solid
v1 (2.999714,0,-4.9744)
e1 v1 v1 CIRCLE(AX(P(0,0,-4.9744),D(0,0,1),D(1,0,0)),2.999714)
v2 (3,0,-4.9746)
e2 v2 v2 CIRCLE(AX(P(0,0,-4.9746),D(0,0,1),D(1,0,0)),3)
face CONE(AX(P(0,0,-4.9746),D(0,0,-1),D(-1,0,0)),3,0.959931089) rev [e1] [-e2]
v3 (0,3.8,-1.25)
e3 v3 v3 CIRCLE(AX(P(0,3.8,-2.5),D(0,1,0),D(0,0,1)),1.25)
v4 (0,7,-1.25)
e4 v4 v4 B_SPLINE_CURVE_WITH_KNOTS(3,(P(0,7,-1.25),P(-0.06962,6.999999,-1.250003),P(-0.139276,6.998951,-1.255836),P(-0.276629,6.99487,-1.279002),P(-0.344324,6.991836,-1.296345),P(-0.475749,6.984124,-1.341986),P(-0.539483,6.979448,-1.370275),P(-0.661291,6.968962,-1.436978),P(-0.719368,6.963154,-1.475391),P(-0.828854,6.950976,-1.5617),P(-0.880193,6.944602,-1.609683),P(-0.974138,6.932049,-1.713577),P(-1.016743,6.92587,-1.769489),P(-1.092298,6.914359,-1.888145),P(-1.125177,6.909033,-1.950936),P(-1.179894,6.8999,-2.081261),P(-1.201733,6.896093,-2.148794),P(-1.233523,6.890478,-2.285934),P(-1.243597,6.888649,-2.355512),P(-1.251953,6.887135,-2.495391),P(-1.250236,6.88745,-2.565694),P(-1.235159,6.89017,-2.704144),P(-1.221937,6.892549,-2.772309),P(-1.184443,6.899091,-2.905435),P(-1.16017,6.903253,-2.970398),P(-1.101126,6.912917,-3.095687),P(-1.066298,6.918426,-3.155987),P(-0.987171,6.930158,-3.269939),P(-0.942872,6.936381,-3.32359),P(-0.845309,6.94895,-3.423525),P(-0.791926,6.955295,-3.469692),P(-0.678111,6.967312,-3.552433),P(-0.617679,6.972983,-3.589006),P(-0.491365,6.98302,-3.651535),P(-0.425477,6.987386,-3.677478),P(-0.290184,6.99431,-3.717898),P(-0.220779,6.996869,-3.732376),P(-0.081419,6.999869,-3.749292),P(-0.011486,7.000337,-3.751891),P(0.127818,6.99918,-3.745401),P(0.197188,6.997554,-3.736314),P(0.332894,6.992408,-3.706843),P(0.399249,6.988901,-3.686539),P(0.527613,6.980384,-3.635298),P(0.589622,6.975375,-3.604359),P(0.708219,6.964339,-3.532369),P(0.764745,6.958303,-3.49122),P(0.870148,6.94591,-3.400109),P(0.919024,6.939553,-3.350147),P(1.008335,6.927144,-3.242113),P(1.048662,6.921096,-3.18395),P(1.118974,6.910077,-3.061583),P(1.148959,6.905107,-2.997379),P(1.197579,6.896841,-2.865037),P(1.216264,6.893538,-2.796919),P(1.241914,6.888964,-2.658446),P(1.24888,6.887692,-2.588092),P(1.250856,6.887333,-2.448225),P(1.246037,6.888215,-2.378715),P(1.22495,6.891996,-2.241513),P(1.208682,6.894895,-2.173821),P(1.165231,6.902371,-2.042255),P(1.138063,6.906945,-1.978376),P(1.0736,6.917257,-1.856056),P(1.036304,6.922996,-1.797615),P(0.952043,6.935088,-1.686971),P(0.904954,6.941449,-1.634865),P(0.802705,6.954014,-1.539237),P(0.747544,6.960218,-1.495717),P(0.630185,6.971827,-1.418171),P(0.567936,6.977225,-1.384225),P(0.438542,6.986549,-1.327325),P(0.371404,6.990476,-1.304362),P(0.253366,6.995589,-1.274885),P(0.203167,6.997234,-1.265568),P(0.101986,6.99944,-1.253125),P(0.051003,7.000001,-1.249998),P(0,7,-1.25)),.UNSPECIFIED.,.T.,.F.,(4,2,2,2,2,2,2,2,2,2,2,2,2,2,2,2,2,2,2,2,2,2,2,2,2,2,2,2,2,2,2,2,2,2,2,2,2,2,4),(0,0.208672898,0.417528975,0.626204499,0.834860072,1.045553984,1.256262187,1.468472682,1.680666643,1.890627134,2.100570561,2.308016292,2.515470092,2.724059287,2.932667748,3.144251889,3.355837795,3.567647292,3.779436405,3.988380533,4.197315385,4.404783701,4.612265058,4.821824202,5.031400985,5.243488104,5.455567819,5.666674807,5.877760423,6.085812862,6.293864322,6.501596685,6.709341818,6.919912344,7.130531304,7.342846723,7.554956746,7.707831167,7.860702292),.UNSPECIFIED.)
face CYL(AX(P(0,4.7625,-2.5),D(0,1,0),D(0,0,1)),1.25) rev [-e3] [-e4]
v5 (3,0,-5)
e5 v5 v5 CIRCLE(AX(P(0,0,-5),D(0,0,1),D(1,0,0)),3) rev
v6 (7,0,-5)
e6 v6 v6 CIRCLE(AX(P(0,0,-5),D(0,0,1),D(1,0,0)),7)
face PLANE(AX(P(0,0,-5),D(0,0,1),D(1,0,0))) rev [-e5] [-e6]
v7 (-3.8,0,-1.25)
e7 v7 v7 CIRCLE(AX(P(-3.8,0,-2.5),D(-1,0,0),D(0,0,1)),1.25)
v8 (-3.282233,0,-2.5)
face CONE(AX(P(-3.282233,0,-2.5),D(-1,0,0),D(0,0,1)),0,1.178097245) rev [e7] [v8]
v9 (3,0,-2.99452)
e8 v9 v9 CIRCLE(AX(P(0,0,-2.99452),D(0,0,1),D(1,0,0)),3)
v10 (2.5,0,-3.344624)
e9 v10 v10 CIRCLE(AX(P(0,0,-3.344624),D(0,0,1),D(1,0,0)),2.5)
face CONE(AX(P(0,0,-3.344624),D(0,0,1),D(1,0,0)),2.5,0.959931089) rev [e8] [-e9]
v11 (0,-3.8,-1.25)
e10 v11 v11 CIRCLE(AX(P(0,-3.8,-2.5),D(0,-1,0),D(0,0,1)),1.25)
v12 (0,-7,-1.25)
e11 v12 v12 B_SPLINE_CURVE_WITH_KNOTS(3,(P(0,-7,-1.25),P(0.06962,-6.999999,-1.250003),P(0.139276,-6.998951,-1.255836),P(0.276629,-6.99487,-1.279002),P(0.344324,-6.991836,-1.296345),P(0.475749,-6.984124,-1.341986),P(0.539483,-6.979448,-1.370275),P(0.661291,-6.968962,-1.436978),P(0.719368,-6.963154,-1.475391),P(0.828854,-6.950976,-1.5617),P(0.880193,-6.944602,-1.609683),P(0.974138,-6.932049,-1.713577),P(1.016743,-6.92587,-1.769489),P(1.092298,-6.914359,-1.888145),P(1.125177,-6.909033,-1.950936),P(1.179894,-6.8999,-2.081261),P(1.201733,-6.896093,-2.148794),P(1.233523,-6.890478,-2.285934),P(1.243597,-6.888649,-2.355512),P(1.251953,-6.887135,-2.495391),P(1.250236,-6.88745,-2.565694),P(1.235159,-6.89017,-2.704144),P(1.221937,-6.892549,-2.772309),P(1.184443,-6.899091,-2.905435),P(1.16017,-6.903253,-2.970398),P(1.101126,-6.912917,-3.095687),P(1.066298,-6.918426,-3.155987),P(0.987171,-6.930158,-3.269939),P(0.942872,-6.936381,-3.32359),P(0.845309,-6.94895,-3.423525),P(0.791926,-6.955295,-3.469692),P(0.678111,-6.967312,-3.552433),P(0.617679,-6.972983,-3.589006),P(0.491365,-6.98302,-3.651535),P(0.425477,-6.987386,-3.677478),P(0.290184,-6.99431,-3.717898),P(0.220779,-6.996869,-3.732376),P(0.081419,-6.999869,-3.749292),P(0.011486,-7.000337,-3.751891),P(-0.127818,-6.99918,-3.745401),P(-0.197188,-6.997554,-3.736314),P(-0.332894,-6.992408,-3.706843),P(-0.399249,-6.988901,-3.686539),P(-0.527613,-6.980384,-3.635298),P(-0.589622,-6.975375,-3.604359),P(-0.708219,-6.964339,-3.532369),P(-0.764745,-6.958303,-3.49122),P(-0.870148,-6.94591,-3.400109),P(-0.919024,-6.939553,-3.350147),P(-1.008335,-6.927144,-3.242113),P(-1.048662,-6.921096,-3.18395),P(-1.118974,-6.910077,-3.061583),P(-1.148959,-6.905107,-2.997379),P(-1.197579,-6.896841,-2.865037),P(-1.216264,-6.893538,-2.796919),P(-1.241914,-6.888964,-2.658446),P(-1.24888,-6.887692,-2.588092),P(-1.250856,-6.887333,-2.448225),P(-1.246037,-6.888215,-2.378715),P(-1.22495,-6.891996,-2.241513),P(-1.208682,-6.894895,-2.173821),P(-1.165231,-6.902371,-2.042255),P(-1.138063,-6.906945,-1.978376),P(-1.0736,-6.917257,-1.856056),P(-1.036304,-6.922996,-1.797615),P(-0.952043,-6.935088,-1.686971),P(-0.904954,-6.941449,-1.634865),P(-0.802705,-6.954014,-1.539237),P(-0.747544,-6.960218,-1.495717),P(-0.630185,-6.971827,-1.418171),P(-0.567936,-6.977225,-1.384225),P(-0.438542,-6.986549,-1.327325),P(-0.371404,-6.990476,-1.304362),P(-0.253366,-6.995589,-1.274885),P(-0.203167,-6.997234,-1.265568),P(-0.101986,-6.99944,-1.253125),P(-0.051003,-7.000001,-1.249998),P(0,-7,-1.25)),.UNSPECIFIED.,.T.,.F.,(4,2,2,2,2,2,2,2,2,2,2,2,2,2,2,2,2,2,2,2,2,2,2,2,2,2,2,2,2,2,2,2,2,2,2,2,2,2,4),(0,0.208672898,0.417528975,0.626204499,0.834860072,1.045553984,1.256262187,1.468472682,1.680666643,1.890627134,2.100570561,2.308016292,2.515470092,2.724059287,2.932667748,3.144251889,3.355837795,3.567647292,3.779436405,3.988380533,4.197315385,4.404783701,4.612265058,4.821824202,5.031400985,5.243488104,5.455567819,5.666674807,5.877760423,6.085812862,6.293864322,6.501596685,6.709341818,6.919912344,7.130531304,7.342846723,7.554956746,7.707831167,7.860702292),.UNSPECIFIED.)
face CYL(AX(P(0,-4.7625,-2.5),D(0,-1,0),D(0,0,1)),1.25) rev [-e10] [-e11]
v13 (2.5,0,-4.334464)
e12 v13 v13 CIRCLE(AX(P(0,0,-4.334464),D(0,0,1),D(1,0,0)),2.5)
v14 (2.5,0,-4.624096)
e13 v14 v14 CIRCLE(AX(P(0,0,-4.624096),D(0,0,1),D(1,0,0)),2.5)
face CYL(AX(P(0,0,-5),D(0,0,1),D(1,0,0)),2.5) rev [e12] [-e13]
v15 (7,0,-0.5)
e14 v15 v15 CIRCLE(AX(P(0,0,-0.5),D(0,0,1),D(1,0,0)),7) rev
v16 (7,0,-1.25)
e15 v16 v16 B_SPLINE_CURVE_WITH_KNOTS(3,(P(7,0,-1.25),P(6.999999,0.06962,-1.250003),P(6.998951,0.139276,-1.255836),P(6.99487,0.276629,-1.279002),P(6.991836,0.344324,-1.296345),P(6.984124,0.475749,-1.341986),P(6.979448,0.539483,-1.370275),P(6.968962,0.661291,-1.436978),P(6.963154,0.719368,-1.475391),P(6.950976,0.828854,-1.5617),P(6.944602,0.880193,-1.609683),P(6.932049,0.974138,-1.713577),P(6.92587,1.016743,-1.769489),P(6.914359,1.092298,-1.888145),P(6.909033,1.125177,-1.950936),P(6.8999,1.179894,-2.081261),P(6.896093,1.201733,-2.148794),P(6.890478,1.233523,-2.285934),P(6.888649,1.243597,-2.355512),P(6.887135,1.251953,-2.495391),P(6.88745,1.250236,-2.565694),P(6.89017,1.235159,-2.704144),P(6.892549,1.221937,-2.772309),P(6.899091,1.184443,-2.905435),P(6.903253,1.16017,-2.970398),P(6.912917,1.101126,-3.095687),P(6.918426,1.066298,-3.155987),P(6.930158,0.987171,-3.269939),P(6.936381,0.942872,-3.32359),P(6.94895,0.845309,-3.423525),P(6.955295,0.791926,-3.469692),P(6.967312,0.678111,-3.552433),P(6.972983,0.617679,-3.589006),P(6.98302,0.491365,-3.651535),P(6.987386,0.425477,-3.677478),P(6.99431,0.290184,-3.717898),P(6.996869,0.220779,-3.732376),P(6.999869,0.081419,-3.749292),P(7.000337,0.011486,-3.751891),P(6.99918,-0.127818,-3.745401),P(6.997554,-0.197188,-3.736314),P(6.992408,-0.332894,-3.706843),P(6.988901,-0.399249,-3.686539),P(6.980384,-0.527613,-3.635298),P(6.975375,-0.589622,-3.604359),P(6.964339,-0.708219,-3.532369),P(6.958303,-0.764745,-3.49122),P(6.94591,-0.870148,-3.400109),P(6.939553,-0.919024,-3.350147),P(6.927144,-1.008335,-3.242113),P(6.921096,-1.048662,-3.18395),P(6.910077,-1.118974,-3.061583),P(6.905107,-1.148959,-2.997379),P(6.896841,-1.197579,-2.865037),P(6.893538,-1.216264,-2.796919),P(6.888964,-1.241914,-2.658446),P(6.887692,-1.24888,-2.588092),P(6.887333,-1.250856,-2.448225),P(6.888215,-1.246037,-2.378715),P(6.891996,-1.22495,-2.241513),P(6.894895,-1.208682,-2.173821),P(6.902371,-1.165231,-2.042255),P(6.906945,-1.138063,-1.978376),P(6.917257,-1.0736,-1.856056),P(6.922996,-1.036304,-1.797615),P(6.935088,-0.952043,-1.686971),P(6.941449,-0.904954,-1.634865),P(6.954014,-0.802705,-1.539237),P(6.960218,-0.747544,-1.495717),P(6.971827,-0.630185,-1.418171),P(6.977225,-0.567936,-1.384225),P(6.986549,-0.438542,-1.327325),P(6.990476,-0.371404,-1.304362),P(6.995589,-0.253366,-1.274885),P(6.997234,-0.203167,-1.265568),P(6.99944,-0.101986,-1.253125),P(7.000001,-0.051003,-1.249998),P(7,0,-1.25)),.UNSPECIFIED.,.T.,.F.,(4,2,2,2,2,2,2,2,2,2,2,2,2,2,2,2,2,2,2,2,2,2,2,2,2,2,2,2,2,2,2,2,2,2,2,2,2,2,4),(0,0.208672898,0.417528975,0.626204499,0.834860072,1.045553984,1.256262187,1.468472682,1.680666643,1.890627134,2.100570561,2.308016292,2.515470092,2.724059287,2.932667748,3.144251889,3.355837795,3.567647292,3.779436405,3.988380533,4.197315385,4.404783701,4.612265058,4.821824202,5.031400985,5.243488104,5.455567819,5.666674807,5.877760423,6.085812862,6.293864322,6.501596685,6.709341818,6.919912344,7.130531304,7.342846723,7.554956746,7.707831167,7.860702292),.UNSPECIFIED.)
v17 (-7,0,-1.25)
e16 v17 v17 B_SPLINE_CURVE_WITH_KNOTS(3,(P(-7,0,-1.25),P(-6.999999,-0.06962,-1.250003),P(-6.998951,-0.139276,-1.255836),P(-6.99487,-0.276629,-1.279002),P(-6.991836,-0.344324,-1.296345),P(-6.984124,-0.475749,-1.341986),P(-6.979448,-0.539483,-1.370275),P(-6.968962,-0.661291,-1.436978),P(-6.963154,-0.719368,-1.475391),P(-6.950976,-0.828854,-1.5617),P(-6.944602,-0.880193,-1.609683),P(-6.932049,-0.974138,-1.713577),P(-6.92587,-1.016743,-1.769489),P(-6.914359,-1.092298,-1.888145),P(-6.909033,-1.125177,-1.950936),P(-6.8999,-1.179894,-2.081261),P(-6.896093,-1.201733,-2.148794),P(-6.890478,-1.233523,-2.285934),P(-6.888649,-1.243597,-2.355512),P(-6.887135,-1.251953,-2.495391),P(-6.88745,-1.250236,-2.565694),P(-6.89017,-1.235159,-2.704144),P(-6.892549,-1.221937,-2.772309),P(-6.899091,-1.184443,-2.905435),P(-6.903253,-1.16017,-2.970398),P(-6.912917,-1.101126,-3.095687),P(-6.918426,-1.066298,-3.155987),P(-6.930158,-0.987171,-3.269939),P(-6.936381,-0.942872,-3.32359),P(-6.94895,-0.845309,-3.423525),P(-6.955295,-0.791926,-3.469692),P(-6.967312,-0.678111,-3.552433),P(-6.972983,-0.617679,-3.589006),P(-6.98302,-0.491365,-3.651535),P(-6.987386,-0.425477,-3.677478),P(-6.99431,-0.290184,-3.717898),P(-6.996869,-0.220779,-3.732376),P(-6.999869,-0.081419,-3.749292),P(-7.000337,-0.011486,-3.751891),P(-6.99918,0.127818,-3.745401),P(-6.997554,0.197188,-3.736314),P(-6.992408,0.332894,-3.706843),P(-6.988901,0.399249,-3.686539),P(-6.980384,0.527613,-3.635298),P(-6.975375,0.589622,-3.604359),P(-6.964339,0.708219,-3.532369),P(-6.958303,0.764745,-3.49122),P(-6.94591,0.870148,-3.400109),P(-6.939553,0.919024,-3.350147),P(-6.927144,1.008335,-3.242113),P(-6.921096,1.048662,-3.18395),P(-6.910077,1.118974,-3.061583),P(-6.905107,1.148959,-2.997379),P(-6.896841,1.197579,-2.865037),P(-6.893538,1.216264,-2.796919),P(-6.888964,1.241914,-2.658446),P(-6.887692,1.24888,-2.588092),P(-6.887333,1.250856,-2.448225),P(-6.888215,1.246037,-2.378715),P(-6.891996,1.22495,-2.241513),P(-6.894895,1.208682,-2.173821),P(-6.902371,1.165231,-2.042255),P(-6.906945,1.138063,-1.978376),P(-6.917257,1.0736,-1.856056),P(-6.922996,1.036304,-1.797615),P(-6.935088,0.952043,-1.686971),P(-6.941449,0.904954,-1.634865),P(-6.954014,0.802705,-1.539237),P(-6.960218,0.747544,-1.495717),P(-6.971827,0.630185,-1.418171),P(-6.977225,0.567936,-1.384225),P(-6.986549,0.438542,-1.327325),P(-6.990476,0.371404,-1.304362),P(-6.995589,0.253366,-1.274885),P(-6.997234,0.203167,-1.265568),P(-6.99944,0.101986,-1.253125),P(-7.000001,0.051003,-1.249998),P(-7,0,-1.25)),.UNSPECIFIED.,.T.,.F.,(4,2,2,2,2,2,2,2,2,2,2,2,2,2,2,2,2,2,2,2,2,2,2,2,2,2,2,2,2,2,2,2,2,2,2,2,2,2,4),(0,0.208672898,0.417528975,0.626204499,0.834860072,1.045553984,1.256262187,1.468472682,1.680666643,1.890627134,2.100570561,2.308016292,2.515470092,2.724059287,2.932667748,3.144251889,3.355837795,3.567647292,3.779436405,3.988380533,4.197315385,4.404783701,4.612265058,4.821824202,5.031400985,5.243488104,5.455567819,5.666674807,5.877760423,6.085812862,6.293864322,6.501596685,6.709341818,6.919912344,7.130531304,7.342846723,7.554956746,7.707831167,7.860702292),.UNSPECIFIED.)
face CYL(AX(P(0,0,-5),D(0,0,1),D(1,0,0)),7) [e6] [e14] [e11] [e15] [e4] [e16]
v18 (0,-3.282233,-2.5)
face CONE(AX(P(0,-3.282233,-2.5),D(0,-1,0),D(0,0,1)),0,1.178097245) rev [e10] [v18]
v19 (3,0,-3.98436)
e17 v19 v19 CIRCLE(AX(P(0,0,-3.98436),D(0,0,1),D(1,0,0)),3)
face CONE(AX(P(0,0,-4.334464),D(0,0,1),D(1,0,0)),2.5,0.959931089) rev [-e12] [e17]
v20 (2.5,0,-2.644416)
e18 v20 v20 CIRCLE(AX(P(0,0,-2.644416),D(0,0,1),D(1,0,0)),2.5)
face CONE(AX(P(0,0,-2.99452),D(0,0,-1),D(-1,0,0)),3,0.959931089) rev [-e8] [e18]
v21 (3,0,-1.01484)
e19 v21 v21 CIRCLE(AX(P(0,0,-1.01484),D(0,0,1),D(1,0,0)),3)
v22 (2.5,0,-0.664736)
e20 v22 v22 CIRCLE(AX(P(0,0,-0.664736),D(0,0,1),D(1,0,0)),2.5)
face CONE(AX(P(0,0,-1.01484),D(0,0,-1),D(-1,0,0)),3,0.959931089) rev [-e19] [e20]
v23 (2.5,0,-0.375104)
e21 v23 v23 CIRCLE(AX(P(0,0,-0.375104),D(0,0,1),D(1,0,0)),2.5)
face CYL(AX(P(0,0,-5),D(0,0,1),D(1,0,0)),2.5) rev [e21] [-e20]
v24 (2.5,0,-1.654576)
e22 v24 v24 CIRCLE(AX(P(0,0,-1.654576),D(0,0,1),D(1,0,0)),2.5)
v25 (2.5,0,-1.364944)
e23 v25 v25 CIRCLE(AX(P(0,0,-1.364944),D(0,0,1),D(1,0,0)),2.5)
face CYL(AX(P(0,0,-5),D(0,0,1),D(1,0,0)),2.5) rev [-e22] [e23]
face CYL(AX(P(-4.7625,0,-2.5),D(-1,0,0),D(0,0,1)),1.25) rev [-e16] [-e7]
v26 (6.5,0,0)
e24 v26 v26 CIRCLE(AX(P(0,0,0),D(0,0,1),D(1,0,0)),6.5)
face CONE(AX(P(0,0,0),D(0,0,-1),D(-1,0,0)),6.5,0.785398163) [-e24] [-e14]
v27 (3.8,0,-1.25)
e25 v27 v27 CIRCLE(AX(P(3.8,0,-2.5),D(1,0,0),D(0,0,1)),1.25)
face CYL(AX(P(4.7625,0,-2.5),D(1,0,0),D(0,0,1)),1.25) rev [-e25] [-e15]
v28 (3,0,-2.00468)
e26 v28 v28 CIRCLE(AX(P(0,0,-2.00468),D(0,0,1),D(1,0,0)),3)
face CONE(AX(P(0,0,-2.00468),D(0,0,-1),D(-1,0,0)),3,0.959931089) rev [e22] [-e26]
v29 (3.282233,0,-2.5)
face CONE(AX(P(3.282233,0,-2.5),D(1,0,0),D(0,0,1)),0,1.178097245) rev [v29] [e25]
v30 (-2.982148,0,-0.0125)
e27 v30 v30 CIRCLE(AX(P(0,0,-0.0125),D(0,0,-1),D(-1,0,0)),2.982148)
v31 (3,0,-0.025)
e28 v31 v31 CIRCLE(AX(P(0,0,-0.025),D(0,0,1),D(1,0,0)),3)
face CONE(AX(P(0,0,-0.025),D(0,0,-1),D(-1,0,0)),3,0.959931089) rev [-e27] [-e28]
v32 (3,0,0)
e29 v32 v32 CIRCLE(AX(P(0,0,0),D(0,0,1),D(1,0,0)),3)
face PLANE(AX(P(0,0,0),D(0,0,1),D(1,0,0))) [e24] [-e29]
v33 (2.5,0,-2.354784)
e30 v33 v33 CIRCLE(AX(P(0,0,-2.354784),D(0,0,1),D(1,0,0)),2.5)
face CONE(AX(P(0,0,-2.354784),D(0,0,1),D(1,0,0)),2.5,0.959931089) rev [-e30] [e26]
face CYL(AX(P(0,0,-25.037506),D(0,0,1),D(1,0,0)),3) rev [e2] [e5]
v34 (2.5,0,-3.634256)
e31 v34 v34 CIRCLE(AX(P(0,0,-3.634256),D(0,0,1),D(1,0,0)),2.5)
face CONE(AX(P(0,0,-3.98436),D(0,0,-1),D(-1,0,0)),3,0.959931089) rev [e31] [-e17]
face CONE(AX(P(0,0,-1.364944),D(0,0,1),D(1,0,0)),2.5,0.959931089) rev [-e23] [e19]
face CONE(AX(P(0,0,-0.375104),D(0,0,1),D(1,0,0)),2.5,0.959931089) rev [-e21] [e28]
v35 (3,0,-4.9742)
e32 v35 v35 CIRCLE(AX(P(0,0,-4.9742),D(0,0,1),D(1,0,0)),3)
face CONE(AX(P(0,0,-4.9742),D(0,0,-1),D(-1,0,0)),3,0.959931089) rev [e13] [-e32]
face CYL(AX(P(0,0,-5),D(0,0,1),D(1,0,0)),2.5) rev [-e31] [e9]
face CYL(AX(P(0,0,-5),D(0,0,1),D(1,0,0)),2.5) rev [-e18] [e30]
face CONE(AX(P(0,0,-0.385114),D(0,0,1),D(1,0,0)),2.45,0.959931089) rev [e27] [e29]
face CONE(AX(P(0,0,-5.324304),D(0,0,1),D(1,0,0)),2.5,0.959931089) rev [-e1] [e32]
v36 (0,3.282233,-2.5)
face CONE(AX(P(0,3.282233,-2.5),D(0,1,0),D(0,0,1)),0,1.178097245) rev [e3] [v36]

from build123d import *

# Parameters (mm, degrees)
BASENUTSKE_R    = 7
BASENUTSKE_R_2  = 2.5
BASENUT_DEPTH   = 5
HOLES_COUNT     = 4
THDSCHPAT_COUNT = 6
THDSCHPAT_PITCH = 0.98984


with BuildPart() as part:
    # BaseNutSke → BaseNut (new body)
    with BuildSketch(Plane.XY):
        Circle(BASENUTSKE_R)
        Circle(BASENUTSKE_R_2, mode=Mode.SUBTRACT)
    extrude(amount=-BASENUT_DEPTH)

    # Chamfer1: read off the stored shape, not the designer's step
    # Chamfer1 outline → Chamfer1 (revolve, cut)
    with BuildSketch(Plane.XZ):
        Polygon((2.5, 0), (2.5, -0.350103769), (3, 0), align=None)
        Polygon((7, 0), (6.5, 0), (7, -0.5), align=None)
        Polygon((3, -4.9746), (2.5, -4.624496231), (2.5, -5), (3, -5), align=None)
    revolve(axis=Axis((0, 0, 0), (0, 0, 1)), mode=Mode.SUBTRACT)

    # HoleSke → Hole (revolve, cut)
    with BuildSketch(Plane(origin=(0, 0, 0), x_dir=(0, 0, -1), z_dir=(1, 0, 0)), mode=Mode.PRIVATE) as hole_sk:
        Polygon((2.5, 7), (2.5, 3.282233047), (3.75, 3.8), (3.75, 7), align=None)
    hole = revolve(hole_sk.sketch.rotate(Axis((0, 4.7625, -2.5), (0, -1, 0)), 180), axis=Axis((0, 4.7625, -2.5), (0, -1, 0)), mode=Mode.SUBTRACT)

    # Holes: Hole ×4 about axis
    holes_axis = Axis((0, 0, 0), (0, 0, 1))
    for i in range(1, HOLES_COUNT):
        add(hole.rotate(holes_axis, i * 360 / HOLES_COUNT), mode=Mode.SUBTRACT)

    # ThdSchSke → ThreadSchematic (revolve, cut)
    with BuildSketch(Plane(origin=(0, 0, 0), x_dir=(1, 0, 0), z_dir=(0, 1, 0)), mode=Mode.PRIVATE) as threadschematic_sk:
        Polygon((-3, 0.025), (-2.5, 0.375103769), (-1.25, 0.375103769), (-1.25, -0.325103769), (-2.5, -0.325103769), align=None)
    threadschematic = revolve(threadschematic_sk.sketch.rotate(Axis((0, 0, -0.525), (0, 0, -1)), 180), axis=Axis((0, 0, -0.525), (0, 0, -1)), mode=Mode.SUBTRACT)

    # ThdSchPat: ThreadSchematic ×6
    with Locations(*[(0, 0, -i * THDSCHPAT_PITCH) for i in range(1, THDSCHPAT_COUNT)]):
        add(threadschematic, mode=Mode.SUBTRACT)


solid = part.part
